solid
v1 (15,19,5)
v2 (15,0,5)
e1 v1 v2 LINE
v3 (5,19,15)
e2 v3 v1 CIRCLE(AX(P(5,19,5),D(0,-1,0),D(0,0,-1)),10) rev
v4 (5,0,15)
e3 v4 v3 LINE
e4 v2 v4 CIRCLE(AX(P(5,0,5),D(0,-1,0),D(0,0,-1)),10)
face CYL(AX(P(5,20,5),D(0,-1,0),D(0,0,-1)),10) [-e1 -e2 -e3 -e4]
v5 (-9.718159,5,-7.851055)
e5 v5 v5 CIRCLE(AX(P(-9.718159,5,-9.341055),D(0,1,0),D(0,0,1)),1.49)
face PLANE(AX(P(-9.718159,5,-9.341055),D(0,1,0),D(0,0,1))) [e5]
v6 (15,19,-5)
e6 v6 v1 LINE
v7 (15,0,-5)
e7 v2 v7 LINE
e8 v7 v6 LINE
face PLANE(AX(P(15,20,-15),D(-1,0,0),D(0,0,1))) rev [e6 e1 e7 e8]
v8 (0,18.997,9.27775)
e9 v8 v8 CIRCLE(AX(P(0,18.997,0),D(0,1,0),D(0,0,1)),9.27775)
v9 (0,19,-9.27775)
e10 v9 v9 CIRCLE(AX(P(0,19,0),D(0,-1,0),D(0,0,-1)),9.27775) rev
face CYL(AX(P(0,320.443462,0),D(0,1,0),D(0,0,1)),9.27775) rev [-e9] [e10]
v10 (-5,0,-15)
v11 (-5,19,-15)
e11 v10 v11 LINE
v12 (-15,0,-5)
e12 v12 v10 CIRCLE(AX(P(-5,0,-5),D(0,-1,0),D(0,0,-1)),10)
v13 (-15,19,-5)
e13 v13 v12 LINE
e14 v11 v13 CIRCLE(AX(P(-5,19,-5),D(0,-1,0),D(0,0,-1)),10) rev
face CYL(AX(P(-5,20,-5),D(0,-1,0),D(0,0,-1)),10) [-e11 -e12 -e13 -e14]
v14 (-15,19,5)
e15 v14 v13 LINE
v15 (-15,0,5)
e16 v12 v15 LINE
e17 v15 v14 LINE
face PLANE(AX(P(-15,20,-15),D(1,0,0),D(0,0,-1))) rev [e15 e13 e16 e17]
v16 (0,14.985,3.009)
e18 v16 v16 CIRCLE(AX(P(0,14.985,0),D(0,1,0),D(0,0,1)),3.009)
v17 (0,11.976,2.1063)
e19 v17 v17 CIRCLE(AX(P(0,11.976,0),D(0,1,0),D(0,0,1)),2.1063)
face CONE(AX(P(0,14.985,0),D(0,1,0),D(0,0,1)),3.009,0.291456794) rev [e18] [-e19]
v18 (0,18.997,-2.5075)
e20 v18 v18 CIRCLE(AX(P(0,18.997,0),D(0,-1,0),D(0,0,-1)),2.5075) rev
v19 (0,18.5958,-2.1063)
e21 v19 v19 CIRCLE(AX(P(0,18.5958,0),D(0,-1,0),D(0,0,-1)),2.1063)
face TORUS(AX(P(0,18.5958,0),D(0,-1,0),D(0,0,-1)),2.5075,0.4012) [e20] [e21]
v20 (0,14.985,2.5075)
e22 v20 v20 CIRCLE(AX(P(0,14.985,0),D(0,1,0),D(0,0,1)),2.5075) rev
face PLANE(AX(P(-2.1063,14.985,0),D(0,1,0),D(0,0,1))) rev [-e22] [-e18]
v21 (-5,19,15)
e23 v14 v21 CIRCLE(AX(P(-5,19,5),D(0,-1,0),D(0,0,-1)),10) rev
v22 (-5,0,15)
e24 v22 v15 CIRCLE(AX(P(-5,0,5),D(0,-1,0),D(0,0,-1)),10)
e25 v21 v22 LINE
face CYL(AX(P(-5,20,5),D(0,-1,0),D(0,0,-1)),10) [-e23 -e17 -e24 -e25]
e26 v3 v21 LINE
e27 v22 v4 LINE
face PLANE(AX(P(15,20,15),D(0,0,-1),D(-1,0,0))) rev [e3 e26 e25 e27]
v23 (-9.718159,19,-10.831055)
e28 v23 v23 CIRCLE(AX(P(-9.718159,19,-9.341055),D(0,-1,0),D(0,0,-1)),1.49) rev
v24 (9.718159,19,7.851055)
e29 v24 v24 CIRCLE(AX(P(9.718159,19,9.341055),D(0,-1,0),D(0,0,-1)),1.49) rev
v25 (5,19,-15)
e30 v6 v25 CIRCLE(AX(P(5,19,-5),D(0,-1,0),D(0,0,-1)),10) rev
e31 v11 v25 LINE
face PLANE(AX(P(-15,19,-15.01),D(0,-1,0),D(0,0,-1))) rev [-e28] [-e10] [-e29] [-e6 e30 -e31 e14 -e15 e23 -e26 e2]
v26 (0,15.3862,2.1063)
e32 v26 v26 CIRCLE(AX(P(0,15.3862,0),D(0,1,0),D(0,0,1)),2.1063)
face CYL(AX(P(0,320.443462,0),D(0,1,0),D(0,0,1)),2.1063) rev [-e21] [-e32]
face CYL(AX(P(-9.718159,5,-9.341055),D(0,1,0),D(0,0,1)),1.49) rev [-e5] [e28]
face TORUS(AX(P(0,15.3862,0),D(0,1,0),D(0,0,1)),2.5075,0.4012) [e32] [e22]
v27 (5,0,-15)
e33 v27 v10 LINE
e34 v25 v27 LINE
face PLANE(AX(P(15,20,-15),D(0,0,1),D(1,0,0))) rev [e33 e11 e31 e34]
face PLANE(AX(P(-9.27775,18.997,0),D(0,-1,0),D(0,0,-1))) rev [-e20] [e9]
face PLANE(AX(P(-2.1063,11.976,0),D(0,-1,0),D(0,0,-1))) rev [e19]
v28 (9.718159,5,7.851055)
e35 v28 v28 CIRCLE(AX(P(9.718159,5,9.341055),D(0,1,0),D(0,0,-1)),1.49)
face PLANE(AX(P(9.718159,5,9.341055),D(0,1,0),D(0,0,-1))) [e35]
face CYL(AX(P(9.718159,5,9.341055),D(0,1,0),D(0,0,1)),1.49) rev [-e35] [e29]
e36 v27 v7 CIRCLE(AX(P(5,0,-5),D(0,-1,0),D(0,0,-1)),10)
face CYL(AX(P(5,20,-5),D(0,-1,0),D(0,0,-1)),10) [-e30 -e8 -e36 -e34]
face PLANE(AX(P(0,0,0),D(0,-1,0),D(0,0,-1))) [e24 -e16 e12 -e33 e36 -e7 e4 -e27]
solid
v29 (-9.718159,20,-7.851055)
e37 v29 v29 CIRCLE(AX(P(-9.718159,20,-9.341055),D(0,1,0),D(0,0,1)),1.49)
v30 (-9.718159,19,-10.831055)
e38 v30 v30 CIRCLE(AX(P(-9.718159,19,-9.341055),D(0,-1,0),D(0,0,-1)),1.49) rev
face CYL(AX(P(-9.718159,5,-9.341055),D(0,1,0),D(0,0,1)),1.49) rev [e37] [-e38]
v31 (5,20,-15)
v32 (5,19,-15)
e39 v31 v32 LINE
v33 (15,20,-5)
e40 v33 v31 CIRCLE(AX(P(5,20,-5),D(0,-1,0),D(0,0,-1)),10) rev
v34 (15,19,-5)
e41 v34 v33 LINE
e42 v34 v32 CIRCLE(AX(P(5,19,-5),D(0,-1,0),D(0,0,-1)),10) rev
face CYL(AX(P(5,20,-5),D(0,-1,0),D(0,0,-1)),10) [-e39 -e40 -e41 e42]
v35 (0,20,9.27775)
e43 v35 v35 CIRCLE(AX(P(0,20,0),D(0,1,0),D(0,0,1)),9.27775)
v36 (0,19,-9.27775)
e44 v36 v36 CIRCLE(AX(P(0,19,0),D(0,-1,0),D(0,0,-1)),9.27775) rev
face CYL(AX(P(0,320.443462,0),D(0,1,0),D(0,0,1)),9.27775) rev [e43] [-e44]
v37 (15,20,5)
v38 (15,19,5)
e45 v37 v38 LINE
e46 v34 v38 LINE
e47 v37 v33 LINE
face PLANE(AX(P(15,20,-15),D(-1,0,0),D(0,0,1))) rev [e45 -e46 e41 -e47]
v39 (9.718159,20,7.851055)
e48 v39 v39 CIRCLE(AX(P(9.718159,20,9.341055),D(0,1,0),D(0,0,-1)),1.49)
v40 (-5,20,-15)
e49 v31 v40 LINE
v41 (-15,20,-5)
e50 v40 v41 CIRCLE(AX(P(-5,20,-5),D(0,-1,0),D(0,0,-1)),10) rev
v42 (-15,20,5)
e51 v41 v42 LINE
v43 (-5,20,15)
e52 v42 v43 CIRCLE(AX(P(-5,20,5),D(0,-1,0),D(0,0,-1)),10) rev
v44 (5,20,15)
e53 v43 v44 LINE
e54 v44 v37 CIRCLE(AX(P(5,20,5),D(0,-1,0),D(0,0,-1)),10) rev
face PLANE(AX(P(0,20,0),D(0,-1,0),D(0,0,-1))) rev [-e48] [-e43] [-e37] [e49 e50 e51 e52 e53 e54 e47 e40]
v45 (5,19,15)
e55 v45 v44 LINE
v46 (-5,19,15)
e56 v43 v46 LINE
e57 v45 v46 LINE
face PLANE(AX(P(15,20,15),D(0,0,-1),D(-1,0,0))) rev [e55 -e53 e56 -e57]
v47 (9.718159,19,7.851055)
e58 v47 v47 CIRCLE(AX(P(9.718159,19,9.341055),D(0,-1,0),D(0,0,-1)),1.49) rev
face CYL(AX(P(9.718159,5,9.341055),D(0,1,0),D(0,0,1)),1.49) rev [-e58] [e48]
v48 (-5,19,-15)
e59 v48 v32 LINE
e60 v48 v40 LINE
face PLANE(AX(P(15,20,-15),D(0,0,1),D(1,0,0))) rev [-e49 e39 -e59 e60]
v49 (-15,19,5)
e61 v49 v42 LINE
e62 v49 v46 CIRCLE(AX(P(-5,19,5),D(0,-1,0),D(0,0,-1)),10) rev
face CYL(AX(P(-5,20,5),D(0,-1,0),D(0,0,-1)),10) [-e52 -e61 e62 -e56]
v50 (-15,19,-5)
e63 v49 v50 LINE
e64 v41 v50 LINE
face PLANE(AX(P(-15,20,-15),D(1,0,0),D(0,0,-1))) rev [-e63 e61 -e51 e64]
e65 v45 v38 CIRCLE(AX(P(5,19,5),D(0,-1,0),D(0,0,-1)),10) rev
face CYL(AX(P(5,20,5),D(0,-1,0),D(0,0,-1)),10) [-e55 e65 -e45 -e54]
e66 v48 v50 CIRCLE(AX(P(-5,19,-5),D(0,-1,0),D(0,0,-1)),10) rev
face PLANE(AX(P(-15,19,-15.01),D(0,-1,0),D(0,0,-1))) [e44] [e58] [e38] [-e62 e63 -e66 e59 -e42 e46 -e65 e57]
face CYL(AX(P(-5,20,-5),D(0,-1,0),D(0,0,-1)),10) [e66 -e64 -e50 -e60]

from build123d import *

# Parameters (mm, degrees)
SKIZZE1_W                       = 30
SKIZZE1_H                       = 30
AUFSATZ_LINEAR_AUSTRAGEN1_DEPTH = 20
VERRUNDUNG1_R                   = 10
SKIZZE3_R                       = 1.49
SCHNITT_LINEAR_AUSTRAGEN1_DEPTH = 15
KREISMUSTER1_COUNT              = 2
ABSPALTEN1_SURFACE_1_BACK       = 47.904
ABSPALTEN1_SURFACE_1_DEPTH      = 95.808
ABSPALTEN1_SURFACE_2_BACK       = 47.904
ABSPALTEN1_SURFACE_2_DEPTH      = 95.808


# Read off the part's stored shape, not the designer's step: Formnest1
with BuildPart() as part:
    # Skizze1 → Aufsatz-Linear austragen1 (new body)
    with BuildSketch(Plane(origin=(0, 0, 0), x_dir=(1, 0, 0), z_dir=(0, 1, 0))):
        Rectangle(SKIZZE1_W, SKIZZE1_H)
    extrude(amount=AUFSATZ_LINEAR_AUSTRAGEN1_DEPTH)

    # Formnest1 outline → Formnest1 (revolve, cut)
    with BuildSketch(Plane.XY):
        with BuildLine():
            Line((2.5075, 18.997), (9.27775, 18.997))
            Line((9.27775, 18.997), (9.27775, 20))
            Line((9.27775, 20), (0, 20))
            Line((0, 20), (0, 11.976))
            Line((0, 11.976), (2.1063, 11.976))
            Line((2.1063, 11.976), (3.009, 14.985))
            Line((3.009, 14.985), (2.5075, 14.985))
            ThreePointArc((2.5075, 14.985), (2.223808759, 15.102508759), (2.1063, 15.3862))
            Line((2.1063, 15.3862), (2.1063, 18.5958))
            ThreePointArc((2.1063, 18.5958), (2.223808759, 18.879491241), (2.5075, 18.997))
        make_face()
    revolve(axis=Axis((0, 0, 0), (0, 1, 0)), mode=Mode.SUBTRACT)

    # Verrundung1
    verrundung1_edges = [part.edges().sort_by_distance(p)[0] for p in [
        (-15, 10, -15),
        (15, 10, -15),
        (15, 10, 15),
        (-15, 10, 15),
    ]]
    fillet(verrundung1_edges, radius=VERRUNDUNG1_R)

    # Skizze3 → Schnitt-Linear austragen1 (cut)
    with BuildSketch(Plane(origin=(0, 20, 0), x_dir=(1, 0, 0), z_dir=(0, 1, 0))):
        with Locations(Location((-9.718159066, 9.341055177, 0), (0, 0, 270))):
            Circle(SKIZZE3_R)
    schnitt_linear_austragen1 = extrude(amount=-SCHNITT_LINEAR_AUSTRAGEN1_DEPTH, mode=Mode.SUBTRACT)

    # Kreismuster1: Schnitt-Linear austragen1 ×2 about axis
    kreismuster1_axis = Axis((0, 0, 0), (0, 1, 0))
    for i in range(1, KREISMUSTER1_COUNT):
        add(schnitt_linear_austragen1.rotate(kreismuster1_axis, i * 360 / KREISMUSTER1_COUNT), mode=Mode.SUBTRACT)


with BuildPart() as body_2:
    # Abspalten1: the piece behind the surface
    add(part.part)
    # Abspalten1 surface: a surface, the sketch's curves swept straight by 95.808 mm
    with BuildLine(Plane.XY.offset(15).offset(-ABSPALTEN1_SURFACE_1_BACK), mode=Mode.PRIVATE) as abspalten1_surface_1_path:
        Line((-15, 19), (15, 19))
    abspalten1_surface_1 = Shell.extrude(abspalten1_surface_1_path.wire(), (0 * ABSPALTEN1_SURFACE_1_DEPTH, 0 * ABSPALTEN1_SURFACE_1_DEPTH, 1 * ABSPALTEN1_SURFACE_1_DEPTH))
    split(bisect_by=abspalten1_surface_1, keep=Keep.BOTTOM)


with BuildPart() as part_1:
    add(part.part)

    # Abspalten1: split by a surface, the side it looks to stays
    # Abspalten1 surface: a surface, the sketch's curves swept straight by 95.808 mm
    with BuildLine(Plane.XY.offset(15).offset(-ABSPALTEN1_SURFACE_2_BACK), mode=Mode.PRIVATE) as abspalten1_surface_2_path:
        Line((-15, 19), (15, 19))
    abspalten1_surface_2 = Shell.extrude(abspalten1_surface_2_path.wire(), (0 * ABSPALTEN1_SURFACE_2_DEPTH, 0 * ABSPALTEN1_SURFACE_2_DEPTH, 1 * ABSPALTEN1_SURFACE_2_DEPTH))
    split(bisect_by=abspalten1_surface_2, keep=Keep.TOP)


solid = Compound([body_2.part, part_1.part])
